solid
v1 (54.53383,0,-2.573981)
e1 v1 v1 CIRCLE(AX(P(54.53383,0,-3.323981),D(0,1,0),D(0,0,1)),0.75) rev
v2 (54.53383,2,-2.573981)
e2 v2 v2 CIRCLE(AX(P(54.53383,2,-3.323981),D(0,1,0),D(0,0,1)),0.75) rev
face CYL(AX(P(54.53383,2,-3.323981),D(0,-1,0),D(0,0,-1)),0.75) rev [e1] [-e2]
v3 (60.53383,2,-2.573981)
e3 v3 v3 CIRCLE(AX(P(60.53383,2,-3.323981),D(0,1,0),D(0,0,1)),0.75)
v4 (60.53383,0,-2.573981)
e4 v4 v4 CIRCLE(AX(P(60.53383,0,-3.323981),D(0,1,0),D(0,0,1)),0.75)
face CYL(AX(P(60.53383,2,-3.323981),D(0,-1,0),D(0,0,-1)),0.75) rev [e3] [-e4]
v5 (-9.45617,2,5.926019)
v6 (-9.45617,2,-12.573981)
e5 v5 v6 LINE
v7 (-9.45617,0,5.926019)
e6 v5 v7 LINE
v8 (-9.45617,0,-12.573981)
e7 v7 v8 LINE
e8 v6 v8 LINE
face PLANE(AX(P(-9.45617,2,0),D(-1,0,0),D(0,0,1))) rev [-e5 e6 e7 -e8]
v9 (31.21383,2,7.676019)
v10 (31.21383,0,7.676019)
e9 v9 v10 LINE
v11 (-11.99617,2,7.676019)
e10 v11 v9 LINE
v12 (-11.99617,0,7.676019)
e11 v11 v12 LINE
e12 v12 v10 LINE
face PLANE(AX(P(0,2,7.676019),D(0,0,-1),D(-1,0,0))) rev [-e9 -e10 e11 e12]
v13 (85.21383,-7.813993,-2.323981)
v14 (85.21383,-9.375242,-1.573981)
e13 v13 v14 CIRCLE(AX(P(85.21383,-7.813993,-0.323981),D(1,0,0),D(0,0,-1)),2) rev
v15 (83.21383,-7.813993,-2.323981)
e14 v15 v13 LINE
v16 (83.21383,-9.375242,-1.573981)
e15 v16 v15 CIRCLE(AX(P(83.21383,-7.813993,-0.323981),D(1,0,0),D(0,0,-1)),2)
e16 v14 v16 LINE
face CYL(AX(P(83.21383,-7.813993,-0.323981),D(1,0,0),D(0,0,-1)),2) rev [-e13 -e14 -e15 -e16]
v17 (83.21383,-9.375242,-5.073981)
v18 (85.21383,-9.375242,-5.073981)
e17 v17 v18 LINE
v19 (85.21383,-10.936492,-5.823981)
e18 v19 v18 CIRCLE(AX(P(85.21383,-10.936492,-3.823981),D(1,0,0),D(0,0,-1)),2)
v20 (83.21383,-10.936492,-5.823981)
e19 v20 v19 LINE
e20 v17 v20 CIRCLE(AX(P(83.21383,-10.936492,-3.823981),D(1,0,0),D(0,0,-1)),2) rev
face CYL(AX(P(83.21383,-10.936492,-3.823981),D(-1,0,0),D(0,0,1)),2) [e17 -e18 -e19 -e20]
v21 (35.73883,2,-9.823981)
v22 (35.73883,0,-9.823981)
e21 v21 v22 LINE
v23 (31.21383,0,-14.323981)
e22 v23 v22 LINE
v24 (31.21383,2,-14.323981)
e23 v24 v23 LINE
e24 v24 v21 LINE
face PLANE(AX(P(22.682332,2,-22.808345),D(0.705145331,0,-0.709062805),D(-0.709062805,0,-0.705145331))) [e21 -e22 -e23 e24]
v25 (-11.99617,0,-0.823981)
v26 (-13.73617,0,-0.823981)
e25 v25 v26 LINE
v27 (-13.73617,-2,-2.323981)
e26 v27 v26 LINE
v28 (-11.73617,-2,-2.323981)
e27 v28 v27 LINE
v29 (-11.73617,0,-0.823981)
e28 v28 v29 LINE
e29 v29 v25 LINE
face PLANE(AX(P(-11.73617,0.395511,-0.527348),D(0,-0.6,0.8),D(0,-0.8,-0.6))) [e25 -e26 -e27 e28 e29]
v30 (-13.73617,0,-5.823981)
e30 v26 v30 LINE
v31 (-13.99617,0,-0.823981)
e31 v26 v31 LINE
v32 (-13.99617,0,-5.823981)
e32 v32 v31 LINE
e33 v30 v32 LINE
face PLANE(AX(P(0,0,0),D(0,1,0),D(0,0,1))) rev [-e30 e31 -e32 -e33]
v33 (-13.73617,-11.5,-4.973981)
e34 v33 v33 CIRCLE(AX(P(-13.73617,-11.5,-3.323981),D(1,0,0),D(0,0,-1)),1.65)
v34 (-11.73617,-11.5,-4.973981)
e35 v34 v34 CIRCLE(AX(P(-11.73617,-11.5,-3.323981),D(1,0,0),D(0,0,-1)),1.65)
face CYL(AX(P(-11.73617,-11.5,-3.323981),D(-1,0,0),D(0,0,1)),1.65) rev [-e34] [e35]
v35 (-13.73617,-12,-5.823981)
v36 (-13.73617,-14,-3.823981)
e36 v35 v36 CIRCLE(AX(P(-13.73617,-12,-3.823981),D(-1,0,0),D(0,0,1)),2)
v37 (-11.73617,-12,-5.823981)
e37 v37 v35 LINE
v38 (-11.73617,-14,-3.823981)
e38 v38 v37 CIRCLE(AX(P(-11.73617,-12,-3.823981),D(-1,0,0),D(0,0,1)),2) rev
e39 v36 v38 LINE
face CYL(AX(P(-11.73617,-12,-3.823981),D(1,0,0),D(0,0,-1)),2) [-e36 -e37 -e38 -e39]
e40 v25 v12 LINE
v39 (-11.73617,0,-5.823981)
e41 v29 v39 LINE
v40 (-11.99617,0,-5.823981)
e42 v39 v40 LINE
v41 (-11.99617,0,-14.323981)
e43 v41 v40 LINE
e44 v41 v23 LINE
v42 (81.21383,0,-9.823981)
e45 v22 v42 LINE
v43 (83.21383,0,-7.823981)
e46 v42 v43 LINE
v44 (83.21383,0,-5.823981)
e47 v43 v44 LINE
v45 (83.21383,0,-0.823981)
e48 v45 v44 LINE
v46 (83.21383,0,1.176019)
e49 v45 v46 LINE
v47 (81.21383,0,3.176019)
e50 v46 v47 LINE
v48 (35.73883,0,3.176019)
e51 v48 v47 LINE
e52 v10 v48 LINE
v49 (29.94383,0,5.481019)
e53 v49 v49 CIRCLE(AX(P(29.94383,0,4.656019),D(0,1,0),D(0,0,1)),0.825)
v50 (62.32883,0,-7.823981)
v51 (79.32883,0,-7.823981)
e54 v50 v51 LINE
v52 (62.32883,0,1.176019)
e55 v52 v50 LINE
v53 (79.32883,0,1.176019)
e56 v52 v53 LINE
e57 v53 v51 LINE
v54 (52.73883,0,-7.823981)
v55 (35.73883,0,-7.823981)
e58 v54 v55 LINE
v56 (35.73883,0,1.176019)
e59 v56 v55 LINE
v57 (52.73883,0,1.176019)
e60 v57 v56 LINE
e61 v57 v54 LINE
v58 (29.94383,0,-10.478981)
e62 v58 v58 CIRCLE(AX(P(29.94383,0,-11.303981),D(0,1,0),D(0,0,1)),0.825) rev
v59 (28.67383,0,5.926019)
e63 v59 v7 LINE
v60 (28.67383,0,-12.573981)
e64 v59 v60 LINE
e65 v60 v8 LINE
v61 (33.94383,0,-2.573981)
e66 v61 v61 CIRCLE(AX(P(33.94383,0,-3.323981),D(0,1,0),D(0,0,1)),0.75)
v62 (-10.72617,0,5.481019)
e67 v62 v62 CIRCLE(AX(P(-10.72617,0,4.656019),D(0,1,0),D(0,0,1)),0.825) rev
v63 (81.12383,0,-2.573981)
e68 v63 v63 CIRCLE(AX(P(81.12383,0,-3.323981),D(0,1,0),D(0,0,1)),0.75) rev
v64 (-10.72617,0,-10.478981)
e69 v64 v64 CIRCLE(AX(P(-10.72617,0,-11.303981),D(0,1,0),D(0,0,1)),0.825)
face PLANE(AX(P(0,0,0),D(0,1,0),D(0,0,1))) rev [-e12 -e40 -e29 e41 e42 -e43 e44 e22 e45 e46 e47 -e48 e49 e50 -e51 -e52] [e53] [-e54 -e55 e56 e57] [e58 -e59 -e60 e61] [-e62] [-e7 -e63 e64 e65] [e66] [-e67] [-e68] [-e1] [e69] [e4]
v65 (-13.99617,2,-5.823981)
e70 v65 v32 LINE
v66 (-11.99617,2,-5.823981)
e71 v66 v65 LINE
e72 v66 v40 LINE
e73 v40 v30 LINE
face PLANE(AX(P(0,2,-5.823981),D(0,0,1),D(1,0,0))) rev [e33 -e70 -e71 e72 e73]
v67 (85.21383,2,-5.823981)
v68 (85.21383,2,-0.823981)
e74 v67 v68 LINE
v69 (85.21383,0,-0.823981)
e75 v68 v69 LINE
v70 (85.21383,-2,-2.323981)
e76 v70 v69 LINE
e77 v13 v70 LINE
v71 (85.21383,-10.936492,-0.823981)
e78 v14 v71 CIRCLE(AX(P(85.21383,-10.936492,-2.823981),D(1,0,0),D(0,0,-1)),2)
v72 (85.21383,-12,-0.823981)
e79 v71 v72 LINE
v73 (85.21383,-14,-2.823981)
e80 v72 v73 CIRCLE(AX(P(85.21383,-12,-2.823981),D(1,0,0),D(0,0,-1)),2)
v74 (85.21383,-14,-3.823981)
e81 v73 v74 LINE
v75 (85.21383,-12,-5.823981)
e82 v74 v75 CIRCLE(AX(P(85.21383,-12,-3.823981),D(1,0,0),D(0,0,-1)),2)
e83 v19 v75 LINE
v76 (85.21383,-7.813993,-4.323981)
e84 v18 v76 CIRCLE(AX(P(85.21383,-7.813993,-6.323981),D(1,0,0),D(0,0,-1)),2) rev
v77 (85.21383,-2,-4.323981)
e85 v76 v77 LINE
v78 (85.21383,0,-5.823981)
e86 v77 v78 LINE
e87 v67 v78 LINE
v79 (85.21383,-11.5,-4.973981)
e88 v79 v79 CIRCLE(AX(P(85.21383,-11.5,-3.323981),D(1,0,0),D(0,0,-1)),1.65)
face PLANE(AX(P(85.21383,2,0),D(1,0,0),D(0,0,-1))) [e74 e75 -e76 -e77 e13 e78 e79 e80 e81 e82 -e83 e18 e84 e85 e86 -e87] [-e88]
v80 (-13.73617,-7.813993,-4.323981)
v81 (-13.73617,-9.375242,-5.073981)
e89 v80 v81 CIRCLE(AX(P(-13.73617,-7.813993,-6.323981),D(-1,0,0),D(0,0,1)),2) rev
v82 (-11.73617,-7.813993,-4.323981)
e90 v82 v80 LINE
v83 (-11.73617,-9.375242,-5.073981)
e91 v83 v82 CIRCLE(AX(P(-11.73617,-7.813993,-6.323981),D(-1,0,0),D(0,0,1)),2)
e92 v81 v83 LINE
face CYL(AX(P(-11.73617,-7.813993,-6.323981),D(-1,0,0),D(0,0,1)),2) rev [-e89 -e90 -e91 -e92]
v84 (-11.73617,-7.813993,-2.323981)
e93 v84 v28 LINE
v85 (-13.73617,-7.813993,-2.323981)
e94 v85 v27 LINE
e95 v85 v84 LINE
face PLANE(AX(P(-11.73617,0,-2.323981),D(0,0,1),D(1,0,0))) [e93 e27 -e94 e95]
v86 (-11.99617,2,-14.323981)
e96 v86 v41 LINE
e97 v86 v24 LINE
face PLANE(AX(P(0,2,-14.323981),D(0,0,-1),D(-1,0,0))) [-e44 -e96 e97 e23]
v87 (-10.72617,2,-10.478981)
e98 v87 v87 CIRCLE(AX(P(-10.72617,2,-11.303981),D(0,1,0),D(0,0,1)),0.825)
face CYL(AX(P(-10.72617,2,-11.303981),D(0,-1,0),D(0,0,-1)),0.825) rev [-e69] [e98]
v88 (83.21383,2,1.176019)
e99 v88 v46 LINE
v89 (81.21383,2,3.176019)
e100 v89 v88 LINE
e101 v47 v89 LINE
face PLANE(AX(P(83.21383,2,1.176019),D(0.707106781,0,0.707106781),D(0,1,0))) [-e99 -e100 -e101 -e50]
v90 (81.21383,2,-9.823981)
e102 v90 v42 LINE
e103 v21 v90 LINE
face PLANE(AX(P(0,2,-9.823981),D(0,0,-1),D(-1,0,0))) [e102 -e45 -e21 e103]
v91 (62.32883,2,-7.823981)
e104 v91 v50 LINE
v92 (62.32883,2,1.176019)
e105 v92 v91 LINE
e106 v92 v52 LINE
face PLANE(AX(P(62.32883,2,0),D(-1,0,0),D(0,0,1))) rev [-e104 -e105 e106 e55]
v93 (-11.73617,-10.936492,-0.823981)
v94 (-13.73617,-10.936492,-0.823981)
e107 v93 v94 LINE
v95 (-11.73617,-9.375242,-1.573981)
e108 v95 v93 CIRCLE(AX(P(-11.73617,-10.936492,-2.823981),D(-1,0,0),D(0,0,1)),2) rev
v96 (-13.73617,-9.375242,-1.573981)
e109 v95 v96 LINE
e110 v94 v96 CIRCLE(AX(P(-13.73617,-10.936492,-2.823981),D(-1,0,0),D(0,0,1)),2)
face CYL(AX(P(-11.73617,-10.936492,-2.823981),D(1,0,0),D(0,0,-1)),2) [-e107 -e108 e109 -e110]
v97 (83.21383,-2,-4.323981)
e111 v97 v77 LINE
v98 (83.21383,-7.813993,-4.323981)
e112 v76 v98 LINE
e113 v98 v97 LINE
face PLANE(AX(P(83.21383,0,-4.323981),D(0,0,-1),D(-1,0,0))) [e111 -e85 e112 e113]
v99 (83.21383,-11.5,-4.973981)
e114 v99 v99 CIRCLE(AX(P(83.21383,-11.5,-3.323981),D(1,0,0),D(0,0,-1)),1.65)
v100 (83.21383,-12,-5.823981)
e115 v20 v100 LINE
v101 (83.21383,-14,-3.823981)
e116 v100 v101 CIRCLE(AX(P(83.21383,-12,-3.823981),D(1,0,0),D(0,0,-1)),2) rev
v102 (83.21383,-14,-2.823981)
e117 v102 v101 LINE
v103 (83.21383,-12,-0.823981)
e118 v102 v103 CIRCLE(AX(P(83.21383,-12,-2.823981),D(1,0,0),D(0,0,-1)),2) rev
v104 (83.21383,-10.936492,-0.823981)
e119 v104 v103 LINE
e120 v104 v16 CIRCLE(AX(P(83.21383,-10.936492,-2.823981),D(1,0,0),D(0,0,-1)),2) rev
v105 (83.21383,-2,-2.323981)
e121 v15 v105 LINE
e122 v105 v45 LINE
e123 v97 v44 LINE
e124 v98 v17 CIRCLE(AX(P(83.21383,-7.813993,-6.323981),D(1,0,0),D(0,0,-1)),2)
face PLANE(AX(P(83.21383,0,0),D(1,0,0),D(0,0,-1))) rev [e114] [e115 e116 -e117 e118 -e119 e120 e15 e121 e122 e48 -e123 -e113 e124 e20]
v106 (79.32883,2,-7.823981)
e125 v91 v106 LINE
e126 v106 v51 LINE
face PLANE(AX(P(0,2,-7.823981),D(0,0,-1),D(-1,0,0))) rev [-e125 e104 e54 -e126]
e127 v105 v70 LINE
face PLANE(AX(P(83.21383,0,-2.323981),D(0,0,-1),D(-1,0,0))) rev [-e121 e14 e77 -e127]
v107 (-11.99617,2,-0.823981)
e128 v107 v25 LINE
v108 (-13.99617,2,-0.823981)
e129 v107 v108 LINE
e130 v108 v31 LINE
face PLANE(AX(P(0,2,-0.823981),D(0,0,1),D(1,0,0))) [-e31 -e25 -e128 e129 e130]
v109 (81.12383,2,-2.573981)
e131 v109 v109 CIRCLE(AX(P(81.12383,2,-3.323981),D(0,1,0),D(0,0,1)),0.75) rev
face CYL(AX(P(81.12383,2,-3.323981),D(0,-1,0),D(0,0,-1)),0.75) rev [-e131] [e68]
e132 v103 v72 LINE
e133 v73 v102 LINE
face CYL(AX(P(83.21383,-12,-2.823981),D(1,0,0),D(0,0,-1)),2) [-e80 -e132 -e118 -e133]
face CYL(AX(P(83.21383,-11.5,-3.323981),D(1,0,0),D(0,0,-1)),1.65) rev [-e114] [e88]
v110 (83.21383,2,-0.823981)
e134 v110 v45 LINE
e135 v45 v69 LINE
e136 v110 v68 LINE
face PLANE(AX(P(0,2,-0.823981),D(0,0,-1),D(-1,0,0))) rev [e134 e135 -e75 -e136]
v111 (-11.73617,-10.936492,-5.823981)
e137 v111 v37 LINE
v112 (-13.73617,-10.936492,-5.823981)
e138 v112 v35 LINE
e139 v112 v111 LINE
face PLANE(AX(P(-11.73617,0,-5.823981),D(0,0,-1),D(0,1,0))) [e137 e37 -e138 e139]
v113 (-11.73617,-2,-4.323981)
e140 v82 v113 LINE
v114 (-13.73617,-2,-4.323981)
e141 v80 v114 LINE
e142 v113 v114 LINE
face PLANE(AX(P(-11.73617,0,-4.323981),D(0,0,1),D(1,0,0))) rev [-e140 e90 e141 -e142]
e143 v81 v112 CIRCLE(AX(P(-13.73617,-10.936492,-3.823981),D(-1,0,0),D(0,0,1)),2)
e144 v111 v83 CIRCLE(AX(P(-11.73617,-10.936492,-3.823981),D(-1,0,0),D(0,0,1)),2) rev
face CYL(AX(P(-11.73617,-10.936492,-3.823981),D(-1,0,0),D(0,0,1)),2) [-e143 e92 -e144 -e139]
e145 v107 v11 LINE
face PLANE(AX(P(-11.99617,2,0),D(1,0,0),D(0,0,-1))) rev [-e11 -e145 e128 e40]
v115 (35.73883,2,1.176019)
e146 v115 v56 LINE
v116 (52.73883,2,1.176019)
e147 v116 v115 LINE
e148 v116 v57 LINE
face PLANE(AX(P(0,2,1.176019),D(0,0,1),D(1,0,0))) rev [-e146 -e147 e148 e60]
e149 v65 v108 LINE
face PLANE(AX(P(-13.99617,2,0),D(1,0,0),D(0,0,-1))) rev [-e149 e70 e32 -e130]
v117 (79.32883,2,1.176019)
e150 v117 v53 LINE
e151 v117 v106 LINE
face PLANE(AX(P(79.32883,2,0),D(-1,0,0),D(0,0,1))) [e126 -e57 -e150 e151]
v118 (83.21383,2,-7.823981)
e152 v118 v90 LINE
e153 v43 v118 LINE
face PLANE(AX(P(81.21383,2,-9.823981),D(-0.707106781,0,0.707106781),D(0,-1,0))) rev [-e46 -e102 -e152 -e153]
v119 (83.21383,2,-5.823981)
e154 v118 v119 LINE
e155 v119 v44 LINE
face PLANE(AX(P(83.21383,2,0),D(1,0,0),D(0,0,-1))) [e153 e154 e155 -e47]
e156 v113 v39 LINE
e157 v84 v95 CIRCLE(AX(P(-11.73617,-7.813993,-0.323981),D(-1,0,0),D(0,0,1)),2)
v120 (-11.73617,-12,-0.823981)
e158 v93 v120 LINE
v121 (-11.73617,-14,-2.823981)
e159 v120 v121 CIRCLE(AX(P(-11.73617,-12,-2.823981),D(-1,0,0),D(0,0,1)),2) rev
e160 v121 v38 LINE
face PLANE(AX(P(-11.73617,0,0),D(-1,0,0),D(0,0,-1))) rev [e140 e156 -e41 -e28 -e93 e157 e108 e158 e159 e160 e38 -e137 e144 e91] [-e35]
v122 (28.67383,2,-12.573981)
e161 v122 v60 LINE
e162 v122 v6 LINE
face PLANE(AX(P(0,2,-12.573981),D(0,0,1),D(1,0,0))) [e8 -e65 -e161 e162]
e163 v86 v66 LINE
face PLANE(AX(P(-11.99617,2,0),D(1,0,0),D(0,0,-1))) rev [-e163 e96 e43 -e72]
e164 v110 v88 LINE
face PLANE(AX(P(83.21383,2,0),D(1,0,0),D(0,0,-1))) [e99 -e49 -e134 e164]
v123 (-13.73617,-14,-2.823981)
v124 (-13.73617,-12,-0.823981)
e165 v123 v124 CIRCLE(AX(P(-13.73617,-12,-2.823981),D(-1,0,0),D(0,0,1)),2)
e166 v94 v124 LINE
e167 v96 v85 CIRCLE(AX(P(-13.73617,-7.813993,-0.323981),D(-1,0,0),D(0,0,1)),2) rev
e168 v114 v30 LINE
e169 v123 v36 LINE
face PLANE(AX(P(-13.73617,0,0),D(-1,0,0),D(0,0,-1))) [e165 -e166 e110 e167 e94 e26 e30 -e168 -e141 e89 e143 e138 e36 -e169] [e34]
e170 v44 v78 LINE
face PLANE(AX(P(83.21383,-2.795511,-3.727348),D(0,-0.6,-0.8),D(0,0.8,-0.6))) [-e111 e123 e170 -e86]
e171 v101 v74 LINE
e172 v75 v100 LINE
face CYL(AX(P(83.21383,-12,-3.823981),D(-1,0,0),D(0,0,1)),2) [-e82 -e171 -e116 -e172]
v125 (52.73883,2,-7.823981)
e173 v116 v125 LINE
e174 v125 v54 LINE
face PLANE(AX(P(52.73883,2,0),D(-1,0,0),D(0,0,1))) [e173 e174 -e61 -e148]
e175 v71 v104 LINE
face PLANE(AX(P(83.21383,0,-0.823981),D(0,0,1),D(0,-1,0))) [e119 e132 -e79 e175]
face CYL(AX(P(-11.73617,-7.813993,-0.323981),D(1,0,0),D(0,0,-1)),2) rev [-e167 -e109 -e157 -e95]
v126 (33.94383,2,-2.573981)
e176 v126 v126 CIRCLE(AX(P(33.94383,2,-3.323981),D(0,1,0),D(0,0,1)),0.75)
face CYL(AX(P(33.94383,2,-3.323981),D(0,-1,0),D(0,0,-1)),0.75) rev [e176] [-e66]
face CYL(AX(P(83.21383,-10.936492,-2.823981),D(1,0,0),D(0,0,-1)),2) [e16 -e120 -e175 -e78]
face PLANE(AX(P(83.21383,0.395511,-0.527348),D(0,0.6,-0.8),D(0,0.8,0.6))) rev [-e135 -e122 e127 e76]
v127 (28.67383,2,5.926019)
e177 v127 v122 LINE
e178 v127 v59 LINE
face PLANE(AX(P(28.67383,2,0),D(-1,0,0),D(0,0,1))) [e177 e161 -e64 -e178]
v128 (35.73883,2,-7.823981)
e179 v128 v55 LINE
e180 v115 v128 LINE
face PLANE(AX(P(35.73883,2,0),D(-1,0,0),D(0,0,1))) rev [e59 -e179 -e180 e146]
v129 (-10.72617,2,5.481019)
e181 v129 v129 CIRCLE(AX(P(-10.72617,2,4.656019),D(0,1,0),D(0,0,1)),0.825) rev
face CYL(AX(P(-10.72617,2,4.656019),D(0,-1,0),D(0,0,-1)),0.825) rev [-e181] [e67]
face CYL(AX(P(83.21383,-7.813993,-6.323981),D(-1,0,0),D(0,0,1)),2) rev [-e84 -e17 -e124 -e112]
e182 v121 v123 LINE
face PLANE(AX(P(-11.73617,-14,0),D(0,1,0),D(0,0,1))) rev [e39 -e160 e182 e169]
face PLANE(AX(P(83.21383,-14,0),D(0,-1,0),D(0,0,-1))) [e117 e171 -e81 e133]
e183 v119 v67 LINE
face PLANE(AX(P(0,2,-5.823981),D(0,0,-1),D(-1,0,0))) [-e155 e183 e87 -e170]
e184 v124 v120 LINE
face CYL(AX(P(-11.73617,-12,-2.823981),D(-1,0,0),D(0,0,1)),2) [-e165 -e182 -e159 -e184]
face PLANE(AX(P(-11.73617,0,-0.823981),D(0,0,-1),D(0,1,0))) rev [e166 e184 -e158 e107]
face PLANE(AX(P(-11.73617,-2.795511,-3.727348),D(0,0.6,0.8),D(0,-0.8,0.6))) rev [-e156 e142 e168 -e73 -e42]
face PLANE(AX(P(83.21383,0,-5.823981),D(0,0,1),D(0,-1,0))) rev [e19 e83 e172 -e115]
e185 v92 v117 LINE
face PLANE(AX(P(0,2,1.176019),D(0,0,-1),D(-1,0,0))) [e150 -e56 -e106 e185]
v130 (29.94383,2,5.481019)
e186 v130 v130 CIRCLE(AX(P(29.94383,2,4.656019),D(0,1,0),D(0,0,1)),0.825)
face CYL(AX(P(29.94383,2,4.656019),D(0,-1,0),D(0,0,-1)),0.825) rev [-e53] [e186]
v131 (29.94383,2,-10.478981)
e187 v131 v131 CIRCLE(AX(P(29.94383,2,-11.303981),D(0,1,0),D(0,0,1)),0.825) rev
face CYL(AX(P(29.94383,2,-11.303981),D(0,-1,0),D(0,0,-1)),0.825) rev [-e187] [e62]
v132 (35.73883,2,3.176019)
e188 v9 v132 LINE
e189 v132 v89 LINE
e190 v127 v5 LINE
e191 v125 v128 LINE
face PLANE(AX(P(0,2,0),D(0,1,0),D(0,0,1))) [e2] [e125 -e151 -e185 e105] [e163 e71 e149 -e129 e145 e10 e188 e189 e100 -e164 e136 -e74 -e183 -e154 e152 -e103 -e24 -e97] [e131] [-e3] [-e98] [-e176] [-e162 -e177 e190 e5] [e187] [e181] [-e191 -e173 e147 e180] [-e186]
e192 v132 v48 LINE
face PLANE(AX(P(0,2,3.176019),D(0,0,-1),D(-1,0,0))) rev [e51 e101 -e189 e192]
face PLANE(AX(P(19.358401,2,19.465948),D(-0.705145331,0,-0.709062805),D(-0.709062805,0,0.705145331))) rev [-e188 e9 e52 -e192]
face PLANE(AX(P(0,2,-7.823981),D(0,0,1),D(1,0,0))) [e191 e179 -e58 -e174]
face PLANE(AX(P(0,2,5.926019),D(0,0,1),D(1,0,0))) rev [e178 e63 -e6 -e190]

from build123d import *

# Parameters (mm, degrees)
ESQUISSE1_R        = 0.825
ESQUISSE1_R_2      = 0.75
ESQUISSE1_W        = 38.13
ESQUISSE1_H        = 18.5
ESQUISSE1_W_2      = 17
ESQUISSE1_H_2      = 9
ESQUISSE1_W_3      = 2
ESQUISSE1_H_3      = 5
BOSS_EXTRU_1_DEPTH = 2
CHANFREIN1_SIZE    = 2
ESQUISSE2_R        = 1.65
BOSS_EXTRU_2_DEPTH = 2
CONG_1_R           = 2
CONG_4_R           = 2


with BuildPart() as part:
    # Esquisse1 → Boss.-Extru.1 (new body)
    # profile 1 of 3: a face of its own
    with BuildSketch(Plane(origin=(0, 0, 0), x_dir=(1, 0, 0), z_dir=(0, 1, 0))):
        Polygon((-11.996169772, 14.323981369), (31.213830228, 14.323981369), (35.738830228, 9.823981369), (83.213830228, 9.823981369), (83.213830228, -3.176018631), (35.738830228, -3.176018631), (31.213830228, -7.676018631), (-11.996169772, -7.676018631), align=None)
        with Locations(Location((-10.726169772, 11.303981369, 0), (0, 0, 270))):
            Circle(ESQUISSE1_R, mode=Mode.SUBTRACT)
        with Locations(Location((29.943830228, 11.303981369, 0), (0, 0, 270))):
            Circle(ESQUISSE1_R, mode=Mode.SUBTRACT)
        with Locations(Location((29.943830228, -4.656018631, 0), (0, 0, 270))):
            Circle(ESQUISSE1_R, mode=Mode.SUBTRACT)
        with Locations(Location((-10.726169772, -4.656018631, 0), (0, 0, 270))):
            Circle(ESQUISSE1_R, mode=Mode.SUBTRACT)
        with Locations(Location((33.943830228, 3.323981369, 0), (0, 0, 270))):
            Circle(ESQUISSE1_R_2, mode=Mode.SUBTRACT)
        with Locations(Location((54.533830228, 3.323981369, 0), (0, 0, 270))):
            Circle(ESQUISSE1_R_2, mode=Mode.SUBTRACT)
        with Locations(Location((60.533830228, 3.323981369, 0), (0, 0, 270))):
            Circle(ESQUISSE1_R_2, mode=Mode.SUBTRACT)
        with Locations(Location((81.123830228, 3.323981369, 0), (0, 0, 270))):
            Circle(ESQUISSE1_R_2, mode=Mode.SUBTRACT)
        with Locations((9.608830228, 3.323981369)):
            Rectangle(ESQUISSE1_W, ESQUISSE1_H, mode=Mode.SUBTRACT)
        with Locations((44.238830228, 3.323981369)):
            Rectangle(ESQUISSE1_W_2, ESQUISSE1_H_2, mode=Mode.SUBTRACT)
        with Locations((70.828830228, 3.323981369)):
            Rectangle(ESQUISSE1_W_2, ESQUISSE1_H_2, mode=Mode.SUBTRACT)
    # profile 2 of 3: a face of its own
    with BuildSketch(Plane(origin=(0, 0, 0), x_dir=(1, 0, 0), z_dir=(0, 1, 0))):
        with Locations((-12.996169772, 3.323981369)):
            Rectangle(ESQUISSE1_W_3, ESQUISSE1_H_3)
    # profile 3 of 3: a face of its own
    with BuildSketch(Plane(origin=(0, 0, 0), x_dir=(1, 0, 0), z_dir=(0, 1, 0))):
        with Locations((84.213830228, 3.323981369)):
            Rectangle(ESQUISSE1_W_3, ESQUISSE1_H_3)
    extrude(amount=BOSS_EXTRU_1_DEPTH)

    # Chanfrein1
    chanfrein1_edges = [part.edges().sort_by_distance(p)[0] for p in [
        (83.213830228, 1, -9.823981369),
        (83.213830228, 1, 3.176018631),
    ]]
    chamfer(chanfrein1_edges, length=CHANFREIN1_SIZE)

    # Esquisse2 → Boss.-Extru.2 (add)
    with BuildSketch(Plane(origin=(85.213830228, 0, 0), x_dir=(0, 0, -1), z_dir=(1, 0, 0))):
        Polygon((5.823981369, 0), (0.823981369, 0), (2.323981369, -2), (2.323981369, -9), (0.823981369, -9), (0.823981369, -14), (5.823981369, -14), (5.823981369, -9), (4.323981369, -9), (4.323981369, -2), align=None)
        with Locations((3.323981369, -11.5)):
            Circle(ESQUISSE2_R, mode=Mode.SUBTRACT)
    boss_extru_2 = extrude(amount=-BOSS_EXTRU_2_DEPTH)

    # Symétrie1: Boss.-Extru.2 across plane
    add(boss_extru_2.mirror(Plane(origin=(35.738830228, 2, 0), x_dir=(0, 0, 1), z_dir=(-1, 0, 0))))

    # Congé1
    # the kernel refuses this fillet: 2 mm, written as the material it takes off along each edge
    with BuildSketch(Plane(origin=(90.213830228, -14, -5.823981369), x_dir=(0, 0, 1), z_dir=(-1, 0, 0)), Plane(origin=(90.213830228, -14, -0.823981369), x_dir=(0, 1, 0), z_dir=(-1, 0, 0))) as cong_1_piece_1:
        with BuildLine():
            CenterArc((CONG_1_R, CONG_1_R), CONG_1_R, 180, 90)
            Line((0, CONG_1_R), (-CONG_1_R * 0.02, CONG_1_R))
            Line((-CONG_1_R * 0.02, CONG_1_R), (-CONG_1_R * 0.02, -CONG_1_R * 0.02))
            Line((-CONG_1_R * 0.02, -CONG_1_R * 0.02), (CONG_1_R, -CONG_1_R * 0.02))
            Line((CONG_1_R, -CONG_1_R * 0.02), (CONG_1_R, 0))
        make_face()
    extrude(amount=12, mode=Mode.SUBTRACT)
    with BuildSketch(Plane(origin=(90.055059411, -9, -5.823981369), x_dir=(0, -1, 0), z_dir=(-1, 0, 0)), Plane(origin=(-18.577398955, -9, -0.823981369), x_dir=(0, -1, 0), z_dir=(1, 0, 0))) as cong_1_piece_2:
        with BuildLine():
            CenterArc((1.936491673, 2), CONG_1_R, 194.477512186, 75.522487814)
            Line((0, 1.5), (-0.038729833, 1.49))
            ThreePointArc((-0.038729833, 1.49), (-0.04, 0.75), (-0.04, 0))
            Line((-0.04, 0), (0, -0.04))
            Line((0, -0.04), (1.936491673, -0.04))
            Line((1.936491673, -0.04), (1.936491673, 0))
        make_face()
    extrude(amount=11.682458366, mode=Mode.SUBTRACT)
    with BuildSketch(Plane(origin=(90.055059411, -9, -0.823981369), x_dir=(0, -1, 0), z_dir=(-1, 0, 0)), Plane(origin=(-18.577398955, -9, -5.823981369), x_dir=(0, -1, 0), z_dir=(1, 0, 0))) as cong_1_piece_3:
        with BuildLine():
            CenterArc((1.936491673, -2), CONG_1_R, 90, 75.522487814)
            Line((0, -1.5), (-0.038729833, -1.49))
            ThreePointArc((-0.038729833, -1.49), (-0.04, -0.75), (-0.04, 0))
            Line((-0.04, 0), (0, 0.04))
            Line((0, 0.04), (1.936491673, 0.04))
            Line((1.936491673, 0.04), (1.936491673, 0))
        make_face()
    extrude(amount=11.682458366, mode=Mode.SUBTRACT)
    with BuildSketch(Plane(origin=(-18.736169772, -14, -5.823981369), x_dir=(0, 0, 1), z_dir=(1, 0, 0)), Plane(origin=(-18.736169772, -14, -0.823981369), x_dir=(0, 1, 0), z_dir=(1, 0, 0))) as cong_1_piece_4:
        with BuildLine():
            CenterArc((CONG_1_R, -CONG_1_R), CONG_1_R, 90, 90)
            Line((0, -CONG_1_R), (-CONG_1_R * 0.02, -CONG_1_R))
            Line((-CONG_1_R * 0.02, -CONG_1_R), (-CONG_1_R * 0.02, CONG_1_R * 0.02))
            Line((-CONG_1_R * 0.02, CONG_1_R * 0.02), (CONG_1_R, CONG_1_R * 0.02))
            Line((CONG_1_R, CONG_1_R * 0.02), (CONG_1_R, 0))
        make_face()
    extrude(amount=12, mode=Mode.SUBTRACT)

    # Congé4
    cong_4_edges = [part.edges().sort_by_distance(p)[0] for p in [
        (84.213830228, -9, -4.323981369),
        (84.213830228, -9, -2.323981369),
        (-12.736169772, -9, -4.323981369),
        (-12.736169772, -9, -2.323981369),
    ]]
    fillet(cong_4_edges, radius=CONG_4_R)


solid = part.part
